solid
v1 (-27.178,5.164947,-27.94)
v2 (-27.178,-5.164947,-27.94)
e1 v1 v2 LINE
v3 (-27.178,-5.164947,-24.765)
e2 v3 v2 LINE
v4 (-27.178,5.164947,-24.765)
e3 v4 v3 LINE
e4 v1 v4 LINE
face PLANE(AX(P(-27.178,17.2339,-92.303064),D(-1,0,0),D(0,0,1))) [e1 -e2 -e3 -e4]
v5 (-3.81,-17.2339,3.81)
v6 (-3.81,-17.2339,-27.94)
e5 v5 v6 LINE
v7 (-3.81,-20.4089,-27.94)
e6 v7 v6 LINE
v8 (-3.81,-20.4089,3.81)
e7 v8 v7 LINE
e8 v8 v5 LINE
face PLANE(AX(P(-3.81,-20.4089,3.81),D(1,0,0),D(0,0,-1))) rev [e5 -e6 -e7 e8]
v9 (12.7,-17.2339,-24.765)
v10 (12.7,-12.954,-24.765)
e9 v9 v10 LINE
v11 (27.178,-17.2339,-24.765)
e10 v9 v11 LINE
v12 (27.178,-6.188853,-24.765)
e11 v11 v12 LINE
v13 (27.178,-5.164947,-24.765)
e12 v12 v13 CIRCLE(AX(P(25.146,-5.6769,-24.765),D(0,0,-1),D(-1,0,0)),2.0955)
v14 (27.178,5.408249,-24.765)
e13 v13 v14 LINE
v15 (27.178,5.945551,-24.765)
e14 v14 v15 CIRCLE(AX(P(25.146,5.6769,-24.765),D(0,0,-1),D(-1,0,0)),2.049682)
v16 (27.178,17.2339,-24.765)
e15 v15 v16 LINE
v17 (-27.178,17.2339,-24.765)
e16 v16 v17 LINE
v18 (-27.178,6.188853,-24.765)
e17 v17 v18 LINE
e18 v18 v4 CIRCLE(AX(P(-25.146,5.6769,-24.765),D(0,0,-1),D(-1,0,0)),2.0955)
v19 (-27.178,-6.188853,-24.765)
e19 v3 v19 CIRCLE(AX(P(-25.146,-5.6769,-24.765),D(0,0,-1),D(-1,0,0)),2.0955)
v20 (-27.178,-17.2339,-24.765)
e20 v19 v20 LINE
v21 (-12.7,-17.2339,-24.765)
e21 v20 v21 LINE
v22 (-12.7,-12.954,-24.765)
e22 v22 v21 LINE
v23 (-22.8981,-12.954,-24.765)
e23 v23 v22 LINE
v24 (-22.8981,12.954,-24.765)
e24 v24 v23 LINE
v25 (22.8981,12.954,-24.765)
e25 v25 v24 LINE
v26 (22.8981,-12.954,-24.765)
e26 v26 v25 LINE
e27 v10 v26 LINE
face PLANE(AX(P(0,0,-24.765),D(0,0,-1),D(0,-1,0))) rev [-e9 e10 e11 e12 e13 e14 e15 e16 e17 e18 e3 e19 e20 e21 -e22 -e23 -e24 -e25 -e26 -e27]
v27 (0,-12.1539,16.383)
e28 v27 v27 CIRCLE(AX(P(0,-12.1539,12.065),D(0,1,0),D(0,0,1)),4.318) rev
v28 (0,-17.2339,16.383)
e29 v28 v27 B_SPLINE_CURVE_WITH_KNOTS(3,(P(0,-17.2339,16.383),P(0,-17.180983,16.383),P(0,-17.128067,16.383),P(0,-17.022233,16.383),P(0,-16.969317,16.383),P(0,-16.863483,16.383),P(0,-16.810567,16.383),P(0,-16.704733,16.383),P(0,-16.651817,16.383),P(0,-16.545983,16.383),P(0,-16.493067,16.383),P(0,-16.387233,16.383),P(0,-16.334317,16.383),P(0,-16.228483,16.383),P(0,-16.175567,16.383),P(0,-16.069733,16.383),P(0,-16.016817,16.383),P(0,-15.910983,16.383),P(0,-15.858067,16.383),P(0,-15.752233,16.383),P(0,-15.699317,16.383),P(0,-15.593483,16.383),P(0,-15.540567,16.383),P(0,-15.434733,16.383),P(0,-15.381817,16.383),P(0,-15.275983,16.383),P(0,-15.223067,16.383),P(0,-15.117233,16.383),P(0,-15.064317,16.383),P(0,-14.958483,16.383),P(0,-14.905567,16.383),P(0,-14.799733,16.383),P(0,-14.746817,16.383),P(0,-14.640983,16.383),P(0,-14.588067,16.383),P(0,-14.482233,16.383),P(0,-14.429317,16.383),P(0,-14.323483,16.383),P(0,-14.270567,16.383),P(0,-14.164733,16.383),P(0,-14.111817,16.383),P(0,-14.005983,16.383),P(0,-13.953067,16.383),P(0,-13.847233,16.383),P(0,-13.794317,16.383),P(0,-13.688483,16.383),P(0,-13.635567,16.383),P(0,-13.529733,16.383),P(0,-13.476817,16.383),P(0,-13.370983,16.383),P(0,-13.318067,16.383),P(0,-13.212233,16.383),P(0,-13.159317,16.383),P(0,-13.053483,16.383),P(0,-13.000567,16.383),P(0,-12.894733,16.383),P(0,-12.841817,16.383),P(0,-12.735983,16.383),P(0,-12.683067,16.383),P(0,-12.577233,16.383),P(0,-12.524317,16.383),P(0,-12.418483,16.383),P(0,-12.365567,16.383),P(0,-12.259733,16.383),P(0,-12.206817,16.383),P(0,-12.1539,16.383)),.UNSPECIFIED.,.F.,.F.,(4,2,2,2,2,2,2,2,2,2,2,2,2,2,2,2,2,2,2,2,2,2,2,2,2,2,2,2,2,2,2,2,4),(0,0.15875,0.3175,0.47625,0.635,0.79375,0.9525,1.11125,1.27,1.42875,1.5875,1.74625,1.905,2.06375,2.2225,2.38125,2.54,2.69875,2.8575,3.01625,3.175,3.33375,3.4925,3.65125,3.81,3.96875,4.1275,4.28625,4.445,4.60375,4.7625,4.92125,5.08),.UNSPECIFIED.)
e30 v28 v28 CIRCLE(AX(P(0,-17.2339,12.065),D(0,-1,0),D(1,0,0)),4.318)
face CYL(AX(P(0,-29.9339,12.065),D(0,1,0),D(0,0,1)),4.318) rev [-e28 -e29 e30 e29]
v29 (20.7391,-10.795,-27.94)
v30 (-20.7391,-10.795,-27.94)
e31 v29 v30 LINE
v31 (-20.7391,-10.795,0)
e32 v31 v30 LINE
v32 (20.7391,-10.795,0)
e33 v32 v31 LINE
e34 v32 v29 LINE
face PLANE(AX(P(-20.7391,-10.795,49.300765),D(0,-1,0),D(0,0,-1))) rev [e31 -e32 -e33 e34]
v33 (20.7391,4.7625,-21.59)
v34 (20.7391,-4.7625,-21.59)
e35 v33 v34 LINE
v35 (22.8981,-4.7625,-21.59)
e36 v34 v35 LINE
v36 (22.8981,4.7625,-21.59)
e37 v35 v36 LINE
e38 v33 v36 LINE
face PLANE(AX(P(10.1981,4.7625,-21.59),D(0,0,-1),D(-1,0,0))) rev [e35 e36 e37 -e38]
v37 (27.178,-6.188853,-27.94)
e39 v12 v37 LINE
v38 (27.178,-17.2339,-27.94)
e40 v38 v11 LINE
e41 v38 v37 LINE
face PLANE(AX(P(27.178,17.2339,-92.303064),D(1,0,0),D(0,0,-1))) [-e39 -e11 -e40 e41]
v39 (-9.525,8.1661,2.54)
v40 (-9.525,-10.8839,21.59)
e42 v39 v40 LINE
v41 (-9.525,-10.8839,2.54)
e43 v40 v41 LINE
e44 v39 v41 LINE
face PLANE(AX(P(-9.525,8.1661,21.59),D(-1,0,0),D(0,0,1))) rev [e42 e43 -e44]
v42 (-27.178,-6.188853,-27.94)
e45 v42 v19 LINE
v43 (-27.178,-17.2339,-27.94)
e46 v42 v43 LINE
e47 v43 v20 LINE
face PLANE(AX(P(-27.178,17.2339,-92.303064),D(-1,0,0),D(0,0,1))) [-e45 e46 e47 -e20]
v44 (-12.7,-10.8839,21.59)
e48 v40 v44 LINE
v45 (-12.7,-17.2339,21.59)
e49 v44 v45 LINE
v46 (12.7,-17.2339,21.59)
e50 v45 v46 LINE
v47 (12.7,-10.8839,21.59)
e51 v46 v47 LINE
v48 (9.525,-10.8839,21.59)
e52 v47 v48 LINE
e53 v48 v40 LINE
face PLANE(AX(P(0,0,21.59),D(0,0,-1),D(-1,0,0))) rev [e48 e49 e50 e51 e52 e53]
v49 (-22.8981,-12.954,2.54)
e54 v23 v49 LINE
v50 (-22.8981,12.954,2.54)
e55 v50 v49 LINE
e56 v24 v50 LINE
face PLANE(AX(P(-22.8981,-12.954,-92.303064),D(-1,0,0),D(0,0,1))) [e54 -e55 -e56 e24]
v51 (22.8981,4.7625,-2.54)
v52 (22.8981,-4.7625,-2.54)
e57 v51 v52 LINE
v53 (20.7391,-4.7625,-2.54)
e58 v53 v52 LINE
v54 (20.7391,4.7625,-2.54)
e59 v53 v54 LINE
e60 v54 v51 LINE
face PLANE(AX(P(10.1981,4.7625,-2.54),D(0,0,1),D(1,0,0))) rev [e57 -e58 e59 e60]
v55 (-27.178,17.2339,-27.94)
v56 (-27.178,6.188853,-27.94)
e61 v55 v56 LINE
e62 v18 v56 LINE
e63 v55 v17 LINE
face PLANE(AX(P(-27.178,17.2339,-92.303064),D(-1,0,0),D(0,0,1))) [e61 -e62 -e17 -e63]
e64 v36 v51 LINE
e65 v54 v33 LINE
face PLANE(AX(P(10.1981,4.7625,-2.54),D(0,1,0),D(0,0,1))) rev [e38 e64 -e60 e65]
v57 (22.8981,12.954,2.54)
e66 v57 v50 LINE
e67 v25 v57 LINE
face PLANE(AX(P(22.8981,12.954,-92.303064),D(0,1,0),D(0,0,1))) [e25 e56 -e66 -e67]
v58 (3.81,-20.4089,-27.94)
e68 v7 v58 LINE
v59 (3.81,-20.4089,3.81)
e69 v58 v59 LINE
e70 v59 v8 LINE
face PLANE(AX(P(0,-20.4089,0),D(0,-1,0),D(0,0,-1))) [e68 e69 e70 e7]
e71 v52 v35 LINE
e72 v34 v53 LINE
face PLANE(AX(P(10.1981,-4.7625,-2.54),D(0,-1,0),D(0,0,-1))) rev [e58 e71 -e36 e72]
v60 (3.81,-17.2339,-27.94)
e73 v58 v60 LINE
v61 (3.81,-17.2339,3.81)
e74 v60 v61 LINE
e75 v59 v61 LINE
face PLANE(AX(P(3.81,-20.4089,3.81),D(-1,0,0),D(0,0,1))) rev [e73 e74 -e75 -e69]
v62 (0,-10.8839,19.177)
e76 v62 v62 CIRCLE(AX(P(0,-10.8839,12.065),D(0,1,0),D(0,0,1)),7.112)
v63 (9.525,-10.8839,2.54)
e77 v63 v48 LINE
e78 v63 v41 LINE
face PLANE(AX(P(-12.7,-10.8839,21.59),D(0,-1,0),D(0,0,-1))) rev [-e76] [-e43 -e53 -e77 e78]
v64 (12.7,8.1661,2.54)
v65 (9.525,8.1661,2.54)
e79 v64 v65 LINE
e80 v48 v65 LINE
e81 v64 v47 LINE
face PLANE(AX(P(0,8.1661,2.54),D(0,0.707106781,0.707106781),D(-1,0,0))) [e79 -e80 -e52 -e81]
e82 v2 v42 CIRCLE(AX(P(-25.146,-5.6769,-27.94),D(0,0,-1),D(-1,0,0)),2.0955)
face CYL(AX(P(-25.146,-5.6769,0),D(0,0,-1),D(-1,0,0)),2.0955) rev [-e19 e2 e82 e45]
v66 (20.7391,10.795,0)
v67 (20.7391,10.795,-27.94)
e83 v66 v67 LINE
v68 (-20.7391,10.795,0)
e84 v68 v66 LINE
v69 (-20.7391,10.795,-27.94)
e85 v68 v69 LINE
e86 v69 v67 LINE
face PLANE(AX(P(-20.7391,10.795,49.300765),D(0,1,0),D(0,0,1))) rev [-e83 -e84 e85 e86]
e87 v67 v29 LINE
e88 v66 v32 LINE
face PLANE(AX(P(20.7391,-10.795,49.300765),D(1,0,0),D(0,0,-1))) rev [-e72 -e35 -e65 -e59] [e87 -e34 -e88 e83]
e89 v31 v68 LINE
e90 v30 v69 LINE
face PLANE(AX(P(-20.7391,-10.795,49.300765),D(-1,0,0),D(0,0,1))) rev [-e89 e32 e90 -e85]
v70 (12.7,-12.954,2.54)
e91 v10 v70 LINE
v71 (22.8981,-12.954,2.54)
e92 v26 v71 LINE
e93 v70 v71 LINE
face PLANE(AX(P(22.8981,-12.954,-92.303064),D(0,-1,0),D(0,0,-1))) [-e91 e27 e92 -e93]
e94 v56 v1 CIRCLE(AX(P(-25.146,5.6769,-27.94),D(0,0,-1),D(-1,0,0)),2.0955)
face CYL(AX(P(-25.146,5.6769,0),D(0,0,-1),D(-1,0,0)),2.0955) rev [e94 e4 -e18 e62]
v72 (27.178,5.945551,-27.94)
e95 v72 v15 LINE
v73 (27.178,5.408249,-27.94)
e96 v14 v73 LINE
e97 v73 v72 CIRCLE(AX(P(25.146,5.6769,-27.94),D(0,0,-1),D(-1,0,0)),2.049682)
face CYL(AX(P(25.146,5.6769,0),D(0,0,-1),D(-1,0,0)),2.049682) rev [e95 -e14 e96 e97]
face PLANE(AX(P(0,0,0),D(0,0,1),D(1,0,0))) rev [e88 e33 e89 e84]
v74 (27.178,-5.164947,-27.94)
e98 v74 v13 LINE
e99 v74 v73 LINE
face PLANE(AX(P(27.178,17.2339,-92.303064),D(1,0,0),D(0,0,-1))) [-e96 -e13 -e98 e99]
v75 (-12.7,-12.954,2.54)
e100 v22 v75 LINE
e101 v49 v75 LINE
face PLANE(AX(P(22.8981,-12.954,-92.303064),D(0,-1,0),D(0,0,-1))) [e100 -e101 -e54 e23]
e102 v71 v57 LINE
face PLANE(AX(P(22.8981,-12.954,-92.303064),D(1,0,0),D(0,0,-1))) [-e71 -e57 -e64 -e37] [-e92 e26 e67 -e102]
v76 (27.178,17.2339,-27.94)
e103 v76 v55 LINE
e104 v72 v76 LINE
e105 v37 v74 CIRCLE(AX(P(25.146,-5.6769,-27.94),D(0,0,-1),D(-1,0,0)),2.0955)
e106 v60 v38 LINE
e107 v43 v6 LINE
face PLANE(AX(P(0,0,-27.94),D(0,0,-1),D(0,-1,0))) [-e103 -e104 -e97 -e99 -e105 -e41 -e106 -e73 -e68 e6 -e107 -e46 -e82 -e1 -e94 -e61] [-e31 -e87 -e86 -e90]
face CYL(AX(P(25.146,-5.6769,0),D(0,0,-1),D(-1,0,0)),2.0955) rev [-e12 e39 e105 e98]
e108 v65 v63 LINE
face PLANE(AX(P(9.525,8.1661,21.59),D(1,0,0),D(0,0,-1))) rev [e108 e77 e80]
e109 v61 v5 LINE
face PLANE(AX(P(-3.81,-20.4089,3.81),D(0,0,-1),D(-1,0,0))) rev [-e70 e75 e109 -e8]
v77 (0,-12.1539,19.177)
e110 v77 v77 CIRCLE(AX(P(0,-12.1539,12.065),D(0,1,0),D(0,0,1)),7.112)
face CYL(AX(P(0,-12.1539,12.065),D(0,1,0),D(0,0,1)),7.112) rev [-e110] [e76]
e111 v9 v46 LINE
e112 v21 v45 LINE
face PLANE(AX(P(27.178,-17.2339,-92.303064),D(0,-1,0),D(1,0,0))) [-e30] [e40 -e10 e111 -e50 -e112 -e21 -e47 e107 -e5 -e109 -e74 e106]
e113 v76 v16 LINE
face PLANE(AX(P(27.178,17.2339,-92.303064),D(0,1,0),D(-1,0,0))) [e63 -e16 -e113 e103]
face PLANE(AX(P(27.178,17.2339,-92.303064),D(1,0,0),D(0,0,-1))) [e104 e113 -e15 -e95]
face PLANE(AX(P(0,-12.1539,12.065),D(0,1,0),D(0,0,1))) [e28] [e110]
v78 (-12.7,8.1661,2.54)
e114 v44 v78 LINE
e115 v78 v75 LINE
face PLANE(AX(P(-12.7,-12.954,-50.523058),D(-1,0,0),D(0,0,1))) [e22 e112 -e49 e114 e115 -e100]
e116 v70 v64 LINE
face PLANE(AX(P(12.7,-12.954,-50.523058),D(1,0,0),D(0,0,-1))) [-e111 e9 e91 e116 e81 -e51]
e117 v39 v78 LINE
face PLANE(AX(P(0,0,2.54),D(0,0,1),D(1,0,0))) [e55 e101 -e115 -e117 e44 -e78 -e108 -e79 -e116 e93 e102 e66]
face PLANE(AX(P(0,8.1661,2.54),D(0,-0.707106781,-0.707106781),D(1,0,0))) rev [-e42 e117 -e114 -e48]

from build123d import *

# Parameters (mm, degrees)
SKETCH1_W           = 54.356
SKETCH1_H           = 34.4678
SKETCH1_W_2         = 40.2082
SKETCH1_H_2         = 20.32
BOSS_EXTRUDE1_DEPTH = 27.94
SKETCH2_W           = 54.356
SKETCH2_H           = 34.4678
SKETCH2_W_2         = 45.7962
SKETCH2_H_2         = 25.908
CUT_EXTRUDE1_DEPTH  = 24.765
SKETCH3_R           = 2.04968225
SKETCH3_R_2         = 2.0955
CUT_EXTRUDE2_DEPTH  = 43.618007851
SKETCH4_W           = 19.05
SKETCH4_H           = 9.525
CUT_EXTRUDE3_DEPTH  = 12.7
SKETCH5_W           = 45.7962
SKETCH5_H           = 25.908
BOSS_EXTRUDE2_DEPTH = 2.54
SKETCH6_W           = 25.4
SKETCH6_H           = 4.2799
BOSS_EXTRUDE3_DEPTH = 27.305
SKETCH7_W           = 25.4
SKETCH7_H           = 6.35
BOSS_EXTRUDE4_DEPTH = 19.05
SKETCH8_R           = 4.318
CUT_EXTRUDE4_DEPTH  = 19.05
SKETCH9_R           = 7.112
CUT_EXTRUDE5_DEPTH  = 1.27
SKETCH10_W          = 3.175
SKETCH10_H          = 19.05
BOSS_EXTRUDE5_DEPTH = 19.05
CHAMFER1_SIZE       = 19.05
SKETCH12_W          = 7.62
SKETCH12_H          = 31.75
BOSS_EXTRUDE6_DEPTH = 3.175
SKETCH13_W          = 41.4782
SKETCH13_H          = 21.59
CUT_EXTRUDE7_DEPTH  = 27.94


with BuildPart() as part:
    # Sketch1 → Boss-Extrude1 (new body)
    with BuildSketch(Plane.XY):
        Rectangle(SKETCH1_W, SKETCH1_H)
        Rectangle(SKETCH1_W_2, SKETCH1_H_2, mode=Mode.SUBTRACT)
    extrude(amount=-BOSS_EXTRUDE1_DEPTH)

    # Sketch2 → Cut-Extrude1 (cut)
    with BuildSketch(Plane.XY):
        Rectangle(SKETCH2_W, SKETCH2_H)
        Rectangle(SKETCH2_W_2, SKETCH2_H_2, mode=Mode.SUBTRACT)
    extrude(amount=-CUT_EXTRUDE1_DEPTH, mode=Mode.SUBTRACT)

    # Sketch3 → Cut-Extrude2 (cut, through all)
    with BuildSketch(Plane(origin=(0, 0, -27.94), x_dir=(-1, 0, 0), z_dir=(0, 0, -1))):
        with Locations((-25.146, 5.6769)):
            Circle(SKETCH3_R)
        with Locations((-25.146, -5.6769)):
            Circle(SKETCH3_R_2)
        with Locations((25.146, -5.6769)):
            Circle(SKETCH3_R_2)
        with Locations((25.146, 5.6769)):
            Circle(SKETCH3_R_2)
    extrude(amount=-CUT_EXTRUDE2_DEPTH, mode=Mode.SUBTRACT)

    # Sketch4 → Cut-Extrude3 (cut)
    with BuildSketch(Plane(origin=(22.8981, 0, 0), x_dir=(0, 0, -1), z_dir=(1, 0, 0))):
        with Locations((12.065, 0)):
            Rectangle(SKETCH4_W, SKETCH4_H)
    extrude(amount=-CUT_EXTRUDE3_DEPTH, mode=Mode.SUBTRACT)

    # Sketch5 → Boss-Extrude2 (add)
    with BuildSketch(Plane.XY):
        Rectangle(SKETCH5_W, SKETCH5_H)
    extrude(amount=BOSS_EXTRUDE2_DEPTH)

    # Sketch6 → Boss-Extrude3 (add)
    with BuildSketch(Plane.XY.offset(2.54)):
        with Locations((0, -15.09395)):
            Rectangle(SKETCH6_W, SKETCH6_H)
    extrude(amount=-BOSS_EXTRUDE3_DEPTH)

    # Sketch7 → Boss-Extrude4 (add)
    with BuildSketch(Plane.XY.offset(2.54)):
        with Locations((0, -14.0589)):
            Rectangle(SKETCH7_W, SKETCH7_H)
    extrude(amount=BOSS_EXTRUDE4_DEPTH)

    # Sketch8 → Cut-Extrude4 (cut)
    with BuildSketch(Plane(origin=(0, -10.8839, 0), x_dir=(1, 0, 0), z_dir=(0, 1, 0))):
        with Locations(Location((0, -12.065, 0), (0, 0, 270))):
            Circle(SKETCH8_R)
    extrude(amount=-CUT_EXTRUDE4_DEPTH, mode=Mode.SUBTRACT)

    # Sketch9 → Cut-Extrude5 (cut)
    with BuildSketch(Plane(origin=(0, -10.8839, 0), x_dir=(1, 0, 0), z_dir=(0, 1, 0))):
        with Locations(Location((0, -12.065, 0), (0, 0, 270))):
            Circle(SKETCH9_R)
    extrude(amount=-CUT_EXTRUDE5_DEPTH, mode=Mode.SUBTRACT)

    # Sketch10 → Boss-Extrude5 (add)
    with BuildSketch(Plane(origin=(0, -10.8839, 0), x_dir=(1, 0, 0), z_dir=(0, 1, 0))):
        with Locations((11.1125, -12.065)):
            Rectangle(SKETCH10_W, SKETCH10_H)
        with Locations((-11.1125, -12.065)):
            Rectangle(SKETCH10_W, SKETCH10_H)
    extrude(amount=BOSS_EXTRUDE5_DEPTH)

    # Chamfer1
    chamfer1_edges = [part.edges().sort_by_distance(p)[0] for p in [
        (-11.1125, 8.1661, 21.59),
        (11.1125, 8.1661, 21.59),
    ]]
    chamfer(chamfer1_edges, length=CHAMFER1_SIZE - 0.0001)  # a hair under: the kernel refuses the full size

    # Sketch12 → Boss-Extrude6 (add)
    with BuildSketch(Plane.XZ.offset(17.2339)):
        with Locations((0, -12.065)):
            Rectangle(SKETCH12_W, SKETCH12_H)
    extrude(amount=BOSS_EXTRUDE6_DEPTH)

    # Sketch13 → Cut-Extrude7 (cut)
    with BuildSketch(Plane(origin=(0, 0, -27.94), x_dir=(-1, 0, 0), z_dir=(0, 0, -1))):
        Rectangle(SKETCH13_W, SKETCH13_H)
    extrude(amount=-CUT_EXTRUDE7_DEPTH, mode=Mode.SUBTRACT)


solid = part.part
